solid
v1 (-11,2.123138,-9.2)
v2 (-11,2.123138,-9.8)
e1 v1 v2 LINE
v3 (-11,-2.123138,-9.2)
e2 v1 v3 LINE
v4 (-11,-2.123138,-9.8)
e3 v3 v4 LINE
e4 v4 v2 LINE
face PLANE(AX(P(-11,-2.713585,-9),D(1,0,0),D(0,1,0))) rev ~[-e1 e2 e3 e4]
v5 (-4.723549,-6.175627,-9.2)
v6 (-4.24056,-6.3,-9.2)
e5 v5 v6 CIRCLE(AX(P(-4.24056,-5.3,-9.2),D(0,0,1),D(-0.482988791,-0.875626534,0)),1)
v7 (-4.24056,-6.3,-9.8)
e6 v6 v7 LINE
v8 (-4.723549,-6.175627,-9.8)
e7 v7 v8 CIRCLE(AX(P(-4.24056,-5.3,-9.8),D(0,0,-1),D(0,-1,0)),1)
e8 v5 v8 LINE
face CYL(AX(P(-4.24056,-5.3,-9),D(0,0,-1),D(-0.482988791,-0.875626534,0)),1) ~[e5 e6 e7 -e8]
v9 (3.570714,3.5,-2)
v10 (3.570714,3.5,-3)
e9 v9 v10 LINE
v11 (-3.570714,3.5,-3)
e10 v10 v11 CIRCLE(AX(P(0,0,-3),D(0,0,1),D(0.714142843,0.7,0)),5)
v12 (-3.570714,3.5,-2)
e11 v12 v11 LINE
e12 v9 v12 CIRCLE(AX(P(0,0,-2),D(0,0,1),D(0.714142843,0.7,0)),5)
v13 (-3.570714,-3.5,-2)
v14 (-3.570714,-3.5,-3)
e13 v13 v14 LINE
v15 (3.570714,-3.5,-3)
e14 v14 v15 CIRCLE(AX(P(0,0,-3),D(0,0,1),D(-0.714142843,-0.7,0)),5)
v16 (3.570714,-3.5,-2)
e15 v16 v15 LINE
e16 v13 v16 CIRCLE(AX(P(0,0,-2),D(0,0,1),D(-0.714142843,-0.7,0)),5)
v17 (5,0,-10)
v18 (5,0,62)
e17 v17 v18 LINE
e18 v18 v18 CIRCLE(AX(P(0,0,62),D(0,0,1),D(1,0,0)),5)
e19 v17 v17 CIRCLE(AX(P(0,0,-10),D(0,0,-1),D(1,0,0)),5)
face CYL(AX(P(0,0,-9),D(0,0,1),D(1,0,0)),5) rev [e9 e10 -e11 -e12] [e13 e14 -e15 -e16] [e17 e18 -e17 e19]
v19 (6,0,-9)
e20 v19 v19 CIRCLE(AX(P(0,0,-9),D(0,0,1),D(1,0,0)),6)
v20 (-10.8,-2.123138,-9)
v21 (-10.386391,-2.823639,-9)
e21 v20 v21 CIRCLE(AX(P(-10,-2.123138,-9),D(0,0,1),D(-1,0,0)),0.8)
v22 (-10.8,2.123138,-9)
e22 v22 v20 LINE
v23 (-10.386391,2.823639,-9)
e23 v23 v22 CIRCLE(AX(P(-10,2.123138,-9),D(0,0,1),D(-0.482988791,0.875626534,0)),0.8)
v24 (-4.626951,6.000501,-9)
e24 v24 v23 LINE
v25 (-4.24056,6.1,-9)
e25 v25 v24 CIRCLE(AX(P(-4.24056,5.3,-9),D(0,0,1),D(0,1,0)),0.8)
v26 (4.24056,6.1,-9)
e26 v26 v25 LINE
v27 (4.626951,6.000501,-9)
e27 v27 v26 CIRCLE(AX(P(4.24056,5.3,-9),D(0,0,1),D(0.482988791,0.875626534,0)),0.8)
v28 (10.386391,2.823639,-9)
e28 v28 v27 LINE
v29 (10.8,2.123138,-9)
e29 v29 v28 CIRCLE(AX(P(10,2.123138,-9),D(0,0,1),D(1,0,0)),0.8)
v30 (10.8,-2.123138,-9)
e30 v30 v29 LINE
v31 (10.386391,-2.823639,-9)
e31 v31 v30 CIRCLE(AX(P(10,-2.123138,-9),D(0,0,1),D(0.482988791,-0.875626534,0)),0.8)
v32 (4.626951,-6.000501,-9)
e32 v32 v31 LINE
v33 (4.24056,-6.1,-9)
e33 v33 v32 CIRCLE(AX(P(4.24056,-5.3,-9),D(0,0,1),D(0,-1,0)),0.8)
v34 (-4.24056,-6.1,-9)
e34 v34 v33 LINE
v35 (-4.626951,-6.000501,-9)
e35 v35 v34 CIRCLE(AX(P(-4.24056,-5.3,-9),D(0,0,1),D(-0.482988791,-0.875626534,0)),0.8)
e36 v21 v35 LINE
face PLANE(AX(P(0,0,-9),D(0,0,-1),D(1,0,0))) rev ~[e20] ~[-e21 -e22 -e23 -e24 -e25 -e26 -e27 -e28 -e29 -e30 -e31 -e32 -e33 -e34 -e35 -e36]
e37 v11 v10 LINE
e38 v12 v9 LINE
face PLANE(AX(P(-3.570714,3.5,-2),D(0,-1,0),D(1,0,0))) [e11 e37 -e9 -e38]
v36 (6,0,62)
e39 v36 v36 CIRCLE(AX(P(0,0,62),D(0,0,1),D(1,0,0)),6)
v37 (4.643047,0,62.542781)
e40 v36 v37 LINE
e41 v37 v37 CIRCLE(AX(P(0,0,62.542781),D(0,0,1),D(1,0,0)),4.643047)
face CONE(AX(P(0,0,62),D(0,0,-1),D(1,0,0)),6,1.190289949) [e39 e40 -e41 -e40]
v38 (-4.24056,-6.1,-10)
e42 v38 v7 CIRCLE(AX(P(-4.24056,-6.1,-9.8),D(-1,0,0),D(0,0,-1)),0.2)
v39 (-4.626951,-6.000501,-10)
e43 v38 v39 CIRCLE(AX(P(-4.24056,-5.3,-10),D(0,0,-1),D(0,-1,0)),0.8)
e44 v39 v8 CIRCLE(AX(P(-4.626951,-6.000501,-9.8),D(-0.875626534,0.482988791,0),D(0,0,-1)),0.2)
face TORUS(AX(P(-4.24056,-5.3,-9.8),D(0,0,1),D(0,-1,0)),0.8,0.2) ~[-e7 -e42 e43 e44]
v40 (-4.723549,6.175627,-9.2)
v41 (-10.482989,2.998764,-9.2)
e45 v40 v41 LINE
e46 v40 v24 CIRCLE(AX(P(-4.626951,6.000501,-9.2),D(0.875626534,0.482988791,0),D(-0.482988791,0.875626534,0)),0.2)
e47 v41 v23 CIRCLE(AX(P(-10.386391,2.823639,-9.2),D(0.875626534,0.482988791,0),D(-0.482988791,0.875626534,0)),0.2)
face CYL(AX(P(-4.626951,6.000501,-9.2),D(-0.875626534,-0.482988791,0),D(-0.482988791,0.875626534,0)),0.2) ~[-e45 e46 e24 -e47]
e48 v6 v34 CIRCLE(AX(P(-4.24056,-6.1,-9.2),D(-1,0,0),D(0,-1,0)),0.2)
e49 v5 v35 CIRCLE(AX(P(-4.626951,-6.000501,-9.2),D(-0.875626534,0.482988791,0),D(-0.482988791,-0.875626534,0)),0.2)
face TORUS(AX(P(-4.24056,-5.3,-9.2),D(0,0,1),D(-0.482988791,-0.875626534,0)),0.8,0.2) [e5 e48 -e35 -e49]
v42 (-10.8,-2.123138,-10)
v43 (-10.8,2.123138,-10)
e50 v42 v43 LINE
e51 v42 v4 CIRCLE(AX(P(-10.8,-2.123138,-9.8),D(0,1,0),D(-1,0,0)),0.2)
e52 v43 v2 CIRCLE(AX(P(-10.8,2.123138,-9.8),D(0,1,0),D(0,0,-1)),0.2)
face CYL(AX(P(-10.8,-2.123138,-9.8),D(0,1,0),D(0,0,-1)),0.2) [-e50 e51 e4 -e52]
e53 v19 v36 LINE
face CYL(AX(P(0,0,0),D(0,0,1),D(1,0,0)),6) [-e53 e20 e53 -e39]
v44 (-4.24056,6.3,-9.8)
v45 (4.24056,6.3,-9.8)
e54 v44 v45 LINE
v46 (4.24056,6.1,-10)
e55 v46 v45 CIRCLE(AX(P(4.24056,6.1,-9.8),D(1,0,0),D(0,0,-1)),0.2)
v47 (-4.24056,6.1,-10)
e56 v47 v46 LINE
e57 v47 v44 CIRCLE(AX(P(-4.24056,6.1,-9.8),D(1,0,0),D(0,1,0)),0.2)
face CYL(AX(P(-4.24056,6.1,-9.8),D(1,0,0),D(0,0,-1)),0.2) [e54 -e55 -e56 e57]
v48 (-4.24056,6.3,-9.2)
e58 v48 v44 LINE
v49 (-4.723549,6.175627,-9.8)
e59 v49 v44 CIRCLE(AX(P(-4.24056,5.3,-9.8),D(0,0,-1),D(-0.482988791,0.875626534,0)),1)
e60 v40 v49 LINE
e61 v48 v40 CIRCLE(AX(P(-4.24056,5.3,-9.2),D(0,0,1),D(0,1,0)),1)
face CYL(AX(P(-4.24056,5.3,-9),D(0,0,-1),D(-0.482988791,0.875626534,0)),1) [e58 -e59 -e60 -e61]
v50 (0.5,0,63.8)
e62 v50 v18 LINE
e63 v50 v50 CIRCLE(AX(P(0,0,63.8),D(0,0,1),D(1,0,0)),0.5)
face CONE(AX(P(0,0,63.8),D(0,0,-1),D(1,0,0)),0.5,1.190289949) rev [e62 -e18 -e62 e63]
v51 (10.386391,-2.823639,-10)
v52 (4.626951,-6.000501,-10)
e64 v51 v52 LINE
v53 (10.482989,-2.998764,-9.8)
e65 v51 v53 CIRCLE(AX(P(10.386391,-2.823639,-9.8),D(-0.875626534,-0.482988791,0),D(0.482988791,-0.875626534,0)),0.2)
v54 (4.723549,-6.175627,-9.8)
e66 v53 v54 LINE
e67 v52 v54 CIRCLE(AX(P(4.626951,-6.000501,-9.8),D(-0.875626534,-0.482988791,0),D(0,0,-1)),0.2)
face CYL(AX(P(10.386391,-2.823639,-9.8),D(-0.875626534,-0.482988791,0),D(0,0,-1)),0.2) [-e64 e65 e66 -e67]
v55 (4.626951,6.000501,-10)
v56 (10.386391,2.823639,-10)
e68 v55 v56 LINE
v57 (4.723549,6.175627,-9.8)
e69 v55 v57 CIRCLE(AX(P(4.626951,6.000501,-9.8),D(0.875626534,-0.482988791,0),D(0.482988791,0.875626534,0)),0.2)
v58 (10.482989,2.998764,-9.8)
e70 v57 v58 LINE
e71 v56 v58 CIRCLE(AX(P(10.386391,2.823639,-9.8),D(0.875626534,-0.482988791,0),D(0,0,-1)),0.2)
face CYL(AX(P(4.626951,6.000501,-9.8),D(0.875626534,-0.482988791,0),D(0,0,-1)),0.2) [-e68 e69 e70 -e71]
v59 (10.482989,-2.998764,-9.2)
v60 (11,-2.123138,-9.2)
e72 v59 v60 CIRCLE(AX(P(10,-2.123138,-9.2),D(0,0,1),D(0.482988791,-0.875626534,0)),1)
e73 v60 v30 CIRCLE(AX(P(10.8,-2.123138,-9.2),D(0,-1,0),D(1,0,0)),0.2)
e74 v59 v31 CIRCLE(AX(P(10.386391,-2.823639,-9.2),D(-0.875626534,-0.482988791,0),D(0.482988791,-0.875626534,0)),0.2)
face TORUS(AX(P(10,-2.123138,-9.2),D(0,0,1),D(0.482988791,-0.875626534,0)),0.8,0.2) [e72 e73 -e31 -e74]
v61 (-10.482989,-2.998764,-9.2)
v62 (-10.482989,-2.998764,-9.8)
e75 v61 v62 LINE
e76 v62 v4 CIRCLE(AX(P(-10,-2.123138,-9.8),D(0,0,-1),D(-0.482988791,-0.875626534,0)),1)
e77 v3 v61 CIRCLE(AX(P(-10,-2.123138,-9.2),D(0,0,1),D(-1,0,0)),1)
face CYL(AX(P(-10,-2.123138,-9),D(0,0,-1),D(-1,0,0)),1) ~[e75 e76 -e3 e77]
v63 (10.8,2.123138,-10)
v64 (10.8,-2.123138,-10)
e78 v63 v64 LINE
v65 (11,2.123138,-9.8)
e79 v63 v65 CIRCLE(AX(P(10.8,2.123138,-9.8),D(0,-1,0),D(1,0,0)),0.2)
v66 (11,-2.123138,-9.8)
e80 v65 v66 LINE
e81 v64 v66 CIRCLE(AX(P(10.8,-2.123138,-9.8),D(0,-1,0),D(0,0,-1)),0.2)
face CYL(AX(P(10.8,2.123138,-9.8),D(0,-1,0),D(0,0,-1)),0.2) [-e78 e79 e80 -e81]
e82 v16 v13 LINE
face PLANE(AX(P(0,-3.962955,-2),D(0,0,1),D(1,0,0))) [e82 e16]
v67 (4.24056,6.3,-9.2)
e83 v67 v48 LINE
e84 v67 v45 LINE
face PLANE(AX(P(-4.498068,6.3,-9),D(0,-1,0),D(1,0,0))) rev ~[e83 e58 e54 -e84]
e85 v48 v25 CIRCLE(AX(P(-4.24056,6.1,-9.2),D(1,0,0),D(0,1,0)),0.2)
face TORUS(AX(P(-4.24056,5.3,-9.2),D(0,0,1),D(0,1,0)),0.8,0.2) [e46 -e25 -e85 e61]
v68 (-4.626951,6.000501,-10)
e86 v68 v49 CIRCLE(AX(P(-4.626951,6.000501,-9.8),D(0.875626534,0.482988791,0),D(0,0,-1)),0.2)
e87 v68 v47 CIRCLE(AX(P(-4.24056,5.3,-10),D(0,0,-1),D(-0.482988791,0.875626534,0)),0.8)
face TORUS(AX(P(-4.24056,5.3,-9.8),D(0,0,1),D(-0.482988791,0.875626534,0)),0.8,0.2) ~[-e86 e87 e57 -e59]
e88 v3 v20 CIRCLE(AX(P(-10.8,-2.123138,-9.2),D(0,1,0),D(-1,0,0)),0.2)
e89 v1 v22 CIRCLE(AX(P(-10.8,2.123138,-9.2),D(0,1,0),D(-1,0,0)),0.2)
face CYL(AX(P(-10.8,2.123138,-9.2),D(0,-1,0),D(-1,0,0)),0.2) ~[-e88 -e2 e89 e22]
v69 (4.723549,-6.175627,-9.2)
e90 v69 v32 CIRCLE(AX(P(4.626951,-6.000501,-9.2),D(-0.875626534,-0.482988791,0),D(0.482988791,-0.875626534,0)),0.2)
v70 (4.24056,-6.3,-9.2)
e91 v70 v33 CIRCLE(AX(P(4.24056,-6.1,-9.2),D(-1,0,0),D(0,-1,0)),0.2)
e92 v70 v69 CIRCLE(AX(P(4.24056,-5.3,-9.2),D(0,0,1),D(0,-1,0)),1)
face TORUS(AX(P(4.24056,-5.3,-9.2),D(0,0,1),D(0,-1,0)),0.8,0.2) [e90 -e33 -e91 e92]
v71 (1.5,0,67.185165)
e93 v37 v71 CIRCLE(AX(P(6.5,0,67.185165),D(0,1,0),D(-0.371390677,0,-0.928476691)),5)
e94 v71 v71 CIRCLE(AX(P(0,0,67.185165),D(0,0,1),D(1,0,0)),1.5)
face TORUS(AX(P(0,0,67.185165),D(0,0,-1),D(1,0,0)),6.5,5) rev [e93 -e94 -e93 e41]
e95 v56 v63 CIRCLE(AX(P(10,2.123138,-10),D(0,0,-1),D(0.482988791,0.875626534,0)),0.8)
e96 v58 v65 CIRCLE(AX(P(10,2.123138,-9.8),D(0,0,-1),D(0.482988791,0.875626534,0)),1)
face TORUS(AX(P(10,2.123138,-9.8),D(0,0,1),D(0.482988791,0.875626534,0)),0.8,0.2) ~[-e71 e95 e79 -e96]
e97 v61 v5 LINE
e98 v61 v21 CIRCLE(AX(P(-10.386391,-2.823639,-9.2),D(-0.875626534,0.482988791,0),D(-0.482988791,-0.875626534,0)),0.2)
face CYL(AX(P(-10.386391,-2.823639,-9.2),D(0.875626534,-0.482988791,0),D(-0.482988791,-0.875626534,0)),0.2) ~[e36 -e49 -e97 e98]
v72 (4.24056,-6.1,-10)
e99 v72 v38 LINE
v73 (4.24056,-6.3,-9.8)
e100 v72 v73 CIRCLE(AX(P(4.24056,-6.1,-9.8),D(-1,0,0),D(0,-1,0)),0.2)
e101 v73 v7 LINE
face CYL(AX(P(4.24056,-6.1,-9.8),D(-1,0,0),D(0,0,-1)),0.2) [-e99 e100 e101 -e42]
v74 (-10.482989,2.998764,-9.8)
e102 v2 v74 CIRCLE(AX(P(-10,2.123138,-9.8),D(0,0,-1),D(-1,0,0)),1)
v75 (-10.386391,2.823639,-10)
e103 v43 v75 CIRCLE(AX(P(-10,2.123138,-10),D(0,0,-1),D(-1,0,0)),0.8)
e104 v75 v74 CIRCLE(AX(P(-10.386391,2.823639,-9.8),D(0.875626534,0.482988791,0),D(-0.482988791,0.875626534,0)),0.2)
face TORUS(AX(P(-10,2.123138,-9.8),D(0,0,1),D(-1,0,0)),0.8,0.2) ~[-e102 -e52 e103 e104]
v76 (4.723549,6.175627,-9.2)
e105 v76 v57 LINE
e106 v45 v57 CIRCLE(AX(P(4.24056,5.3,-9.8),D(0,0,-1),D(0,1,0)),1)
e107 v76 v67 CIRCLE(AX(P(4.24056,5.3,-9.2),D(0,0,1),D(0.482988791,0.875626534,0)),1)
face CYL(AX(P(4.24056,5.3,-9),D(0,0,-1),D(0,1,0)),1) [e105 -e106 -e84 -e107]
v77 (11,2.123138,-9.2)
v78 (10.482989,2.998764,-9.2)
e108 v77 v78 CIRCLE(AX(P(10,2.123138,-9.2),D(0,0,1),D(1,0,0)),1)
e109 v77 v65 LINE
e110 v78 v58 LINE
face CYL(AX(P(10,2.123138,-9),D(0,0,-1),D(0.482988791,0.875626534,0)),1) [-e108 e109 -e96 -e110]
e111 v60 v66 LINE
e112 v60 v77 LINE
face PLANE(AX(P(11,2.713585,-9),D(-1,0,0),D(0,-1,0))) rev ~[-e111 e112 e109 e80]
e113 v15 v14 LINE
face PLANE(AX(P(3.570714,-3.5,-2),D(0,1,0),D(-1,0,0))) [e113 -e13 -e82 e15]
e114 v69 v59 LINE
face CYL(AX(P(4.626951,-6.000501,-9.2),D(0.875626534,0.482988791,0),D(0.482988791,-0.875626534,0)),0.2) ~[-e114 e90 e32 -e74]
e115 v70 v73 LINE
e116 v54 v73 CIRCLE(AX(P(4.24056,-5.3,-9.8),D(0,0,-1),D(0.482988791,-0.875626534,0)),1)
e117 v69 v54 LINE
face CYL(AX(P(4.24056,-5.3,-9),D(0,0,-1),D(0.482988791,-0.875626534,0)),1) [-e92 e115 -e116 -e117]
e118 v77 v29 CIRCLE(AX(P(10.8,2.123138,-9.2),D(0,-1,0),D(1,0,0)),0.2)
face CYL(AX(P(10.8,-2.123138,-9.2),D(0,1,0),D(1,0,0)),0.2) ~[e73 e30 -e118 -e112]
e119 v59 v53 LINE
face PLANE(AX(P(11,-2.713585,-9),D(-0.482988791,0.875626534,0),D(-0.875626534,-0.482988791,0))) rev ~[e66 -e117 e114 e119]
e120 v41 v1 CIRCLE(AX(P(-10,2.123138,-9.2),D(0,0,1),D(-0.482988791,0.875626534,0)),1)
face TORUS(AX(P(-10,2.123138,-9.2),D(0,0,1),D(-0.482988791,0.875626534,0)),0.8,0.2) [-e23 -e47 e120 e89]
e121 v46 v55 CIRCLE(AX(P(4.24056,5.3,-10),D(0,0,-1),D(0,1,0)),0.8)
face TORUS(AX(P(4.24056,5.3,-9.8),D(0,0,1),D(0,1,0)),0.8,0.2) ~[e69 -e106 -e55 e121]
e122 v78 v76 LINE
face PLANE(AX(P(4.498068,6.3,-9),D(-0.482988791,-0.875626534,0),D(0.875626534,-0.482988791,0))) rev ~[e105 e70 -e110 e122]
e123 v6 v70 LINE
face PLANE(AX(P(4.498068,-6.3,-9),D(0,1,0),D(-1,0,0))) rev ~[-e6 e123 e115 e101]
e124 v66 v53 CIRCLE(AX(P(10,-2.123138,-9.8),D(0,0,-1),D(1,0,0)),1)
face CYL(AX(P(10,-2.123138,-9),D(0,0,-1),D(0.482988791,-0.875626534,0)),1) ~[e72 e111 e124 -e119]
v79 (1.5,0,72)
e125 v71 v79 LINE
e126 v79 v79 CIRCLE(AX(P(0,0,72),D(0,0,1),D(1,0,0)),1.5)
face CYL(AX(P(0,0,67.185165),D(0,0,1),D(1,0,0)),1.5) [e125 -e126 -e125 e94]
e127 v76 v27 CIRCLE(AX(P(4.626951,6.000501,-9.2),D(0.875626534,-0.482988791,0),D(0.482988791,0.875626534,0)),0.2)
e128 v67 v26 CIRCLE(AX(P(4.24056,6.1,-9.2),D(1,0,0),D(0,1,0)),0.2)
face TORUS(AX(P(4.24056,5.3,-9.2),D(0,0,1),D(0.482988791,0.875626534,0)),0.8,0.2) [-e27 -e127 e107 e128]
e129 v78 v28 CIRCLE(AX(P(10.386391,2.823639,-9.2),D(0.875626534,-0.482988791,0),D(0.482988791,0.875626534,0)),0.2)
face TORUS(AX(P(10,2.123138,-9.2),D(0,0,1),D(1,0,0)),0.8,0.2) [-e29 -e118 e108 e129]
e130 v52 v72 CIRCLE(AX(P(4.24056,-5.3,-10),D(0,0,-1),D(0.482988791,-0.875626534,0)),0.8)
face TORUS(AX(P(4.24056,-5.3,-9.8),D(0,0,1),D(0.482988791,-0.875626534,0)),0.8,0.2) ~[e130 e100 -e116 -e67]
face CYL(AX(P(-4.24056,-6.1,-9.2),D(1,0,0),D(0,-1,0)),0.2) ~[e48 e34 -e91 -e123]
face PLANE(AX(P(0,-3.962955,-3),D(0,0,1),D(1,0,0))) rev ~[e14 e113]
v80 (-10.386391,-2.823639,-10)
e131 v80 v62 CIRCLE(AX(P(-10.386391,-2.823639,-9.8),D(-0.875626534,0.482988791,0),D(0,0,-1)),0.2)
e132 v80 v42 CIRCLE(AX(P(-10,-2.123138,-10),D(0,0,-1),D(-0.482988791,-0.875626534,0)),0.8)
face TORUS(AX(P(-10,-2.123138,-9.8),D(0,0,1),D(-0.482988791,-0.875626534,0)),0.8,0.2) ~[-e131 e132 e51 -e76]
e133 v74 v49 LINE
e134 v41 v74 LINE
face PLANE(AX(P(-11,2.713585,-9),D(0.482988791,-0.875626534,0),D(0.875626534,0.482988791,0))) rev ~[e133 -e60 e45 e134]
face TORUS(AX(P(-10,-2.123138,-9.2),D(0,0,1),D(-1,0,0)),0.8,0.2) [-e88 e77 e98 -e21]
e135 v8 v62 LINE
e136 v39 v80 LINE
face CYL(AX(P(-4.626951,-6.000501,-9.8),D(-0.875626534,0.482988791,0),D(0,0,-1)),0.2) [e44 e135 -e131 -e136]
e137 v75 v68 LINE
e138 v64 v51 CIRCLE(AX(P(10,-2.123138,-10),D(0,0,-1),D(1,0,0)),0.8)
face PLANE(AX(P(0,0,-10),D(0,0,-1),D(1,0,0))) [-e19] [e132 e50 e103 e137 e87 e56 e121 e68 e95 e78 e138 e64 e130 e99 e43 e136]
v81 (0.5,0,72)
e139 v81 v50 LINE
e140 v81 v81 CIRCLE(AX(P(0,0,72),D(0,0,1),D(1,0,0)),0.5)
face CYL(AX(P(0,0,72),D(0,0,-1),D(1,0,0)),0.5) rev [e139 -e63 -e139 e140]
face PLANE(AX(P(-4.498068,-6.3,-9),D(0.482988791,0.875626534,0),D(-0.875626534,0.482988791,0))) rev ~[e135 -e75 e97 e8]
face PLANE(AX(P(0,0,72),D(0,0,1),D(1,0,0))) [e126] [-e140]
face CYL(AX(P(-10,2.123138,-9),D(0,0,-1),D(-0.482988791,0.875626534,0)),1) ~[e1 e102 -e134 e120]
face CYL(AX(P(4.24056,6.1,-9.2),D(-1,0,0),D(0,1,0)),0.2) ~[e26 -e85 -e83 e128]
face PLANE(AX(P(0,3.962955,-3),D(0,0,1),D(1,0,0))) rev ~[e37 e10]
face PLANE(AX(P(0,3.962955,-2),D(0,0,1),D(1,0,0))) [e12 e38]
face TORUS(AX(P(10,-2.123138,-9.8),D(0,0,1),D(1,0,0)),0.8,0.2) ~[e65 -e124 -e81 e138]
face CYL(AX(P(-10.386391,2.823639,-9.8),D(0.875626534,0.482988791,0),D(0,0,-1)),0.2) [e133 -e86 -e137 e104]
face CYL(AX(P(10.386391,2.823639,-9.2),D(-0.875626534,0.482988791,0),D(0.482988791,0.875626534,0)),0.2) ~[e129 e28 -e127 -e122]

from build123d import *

# Parameters (mm, degrees)
F0_R          = 6
F0_R_2        = 5
F1_DEPTH      = 62
F1_DEPTH_BACK = 9
F6_DEPTH      = 1
F8_R          = 5
F9_DEPTH      = 1
F10_R         = 1
F11_R         = 0.2
F12_R         = 0.2


# Not quite as in the source:
# - a feature names something its author has since deleted; it is built from what else it names


with BuildPart() as f1:
    # F0 (on Top) → F1 (new body, two sides)
    with BuildSketch(Plane.XY) as f1_sk:
        Circle(F0_R)
        Circle(F0_R_2, mode=Mode.SUBTRACT)
    extrude(amount=F1_DEPTH)
    extrude(f1_sk.sketch, amount=-F1_DEPTH_BACK)

    # F2 (on Front) → F3 (revolve)
    with BuildSketch(Plane.XZ):
        with BuildLine():
            Line((6, 62), (4.6430466171, 62.5427813535))
            ThreePointArc((4.6430466171, 62.5427813535), (2.3596638473, 64.3820207615), (1.5, 67.1851648075))
            Line((1.5, 67.1851648075), (1.5, 72))
            Line((1.5, 72), (0.5, 72))
            Line((0.5, 72), (0.5, 63.8000000012))
            Line((0.5, 63.8000000012), (5, 62))
            Line((5, 62), (6, 62))
        make_face()
    revolve(axis=Axis((0, 0, 62.4439572394), (0, 0, 1)))

    # F5 (on offset) → F6 (join)
    with BuildSketch(Plane.XY.offset(-2)):
        with BuildLine():
            ThreePointArc((-3.5707142143, -3.5), (0, -5), (3.5707142143, -3.5))
            Line((3.5707142143, -3.5), (-3.5707142143, -3.5))
        make_face()
        with BuildLine():
            Line((-3.5707142143, 3.5), (3.5707142143, 3.5))
            ThreePointArc((3.5707142143, 3.5), (0, 5), (-3.5707142143, 3.5))
        make_face()
    extrude(amount=-F6_DEPTH)

    # F8 (on offset) → F9 (join)
    with BuildSketch(Plane(origin=(0, 0, -9), x_dir=(1, 0, 0), z_dir=(0, 0, -1))):
        Polygon((11, 2.7135847191), (4.4980677776, 6.3), (-4.4980677776, 6.3), (-11, 2.7135847191), (-11, -2.7135847191), (-4.4980677776, -6.3), (4.4980677776, -6.3), (11, -2.7135847191), align=None)
        Circle(F8_R, mode=Mode.SUBTRACT)
    extrude(amount=F9_DEPTH)

    # F10
    f10_edges = [f1.edges().sort_by_distance(p)[0] for p in [
        (11, -2.713585, -9.5),
        (4.498068, -6.3, -9.5),
        (11, 2.713585, -9.5),
        (-4.498068, -6.3, -9.5),
        (4.498068, 6.3, -9.5),
        (-11, -2.713585, -9.5),
        (-4.498068, 6.3, -9.5),
        (-11, 2.713585, -9.5),
    ]]
    fillet(f10_edges, radius=F10_R)

    # F11
    f11_edges = [f1.edges().sort_by_distance(p)[0] for p in [
        (-7.603269, -4.587195, -10),
        (-4.489932, -6.268408, -10),
        (0, -6.3, -10),
        (-11, 0, -10),
        (-10.861101, -2.631572, -10),
        (-10.861101, 2.631572, -10),
        (-7.603269, 4.587195, -10),
        (-4.489932, 6.268408, -10),
        (0, 6.3, -10),
        (4.489932, 6.268408, -10),
        (7.603269, 4.587195, -10),
        (7.603269, -4.587195, -10),
        (4.489932, -6.268408, -10),
        (10.861101, -2.631572, -10),
        (11, 0, -10),
        (10.861101, 2.631572, -10),
    ]]
    fillet(f11_edges, radius=F11_R)

    # F12
    f12_edges = [f1.edges().sort_by_distance(p)[0] for p in [
        (10.861101, -2.631572, -9),
        (11, 0, -9),
        (10.861101, 2.631572, -9),
        (7.603269, 4.587195, -9),
        (4.489932, 6.268408, -9),
        (0, 6.3, -9),
        (-4.489932, 6.268408, -9),
        (-10.861101, 2.631572, -9),
        (-7.603269, 4.587195, -9),
        (7.603269, -4.587195, -9),
        (0, -6.3, -9),
        (-11, 0, -9),
        (-10.861101, -2.631572, -9),
        (-4.489932, -6.268408, -9),
        (4.489932, -6.268408, -9),
        (-7.603269, -4.587195, -9),
    ]]
    fillet(f12_edges, radius=F12_R)


solid = f1.part
